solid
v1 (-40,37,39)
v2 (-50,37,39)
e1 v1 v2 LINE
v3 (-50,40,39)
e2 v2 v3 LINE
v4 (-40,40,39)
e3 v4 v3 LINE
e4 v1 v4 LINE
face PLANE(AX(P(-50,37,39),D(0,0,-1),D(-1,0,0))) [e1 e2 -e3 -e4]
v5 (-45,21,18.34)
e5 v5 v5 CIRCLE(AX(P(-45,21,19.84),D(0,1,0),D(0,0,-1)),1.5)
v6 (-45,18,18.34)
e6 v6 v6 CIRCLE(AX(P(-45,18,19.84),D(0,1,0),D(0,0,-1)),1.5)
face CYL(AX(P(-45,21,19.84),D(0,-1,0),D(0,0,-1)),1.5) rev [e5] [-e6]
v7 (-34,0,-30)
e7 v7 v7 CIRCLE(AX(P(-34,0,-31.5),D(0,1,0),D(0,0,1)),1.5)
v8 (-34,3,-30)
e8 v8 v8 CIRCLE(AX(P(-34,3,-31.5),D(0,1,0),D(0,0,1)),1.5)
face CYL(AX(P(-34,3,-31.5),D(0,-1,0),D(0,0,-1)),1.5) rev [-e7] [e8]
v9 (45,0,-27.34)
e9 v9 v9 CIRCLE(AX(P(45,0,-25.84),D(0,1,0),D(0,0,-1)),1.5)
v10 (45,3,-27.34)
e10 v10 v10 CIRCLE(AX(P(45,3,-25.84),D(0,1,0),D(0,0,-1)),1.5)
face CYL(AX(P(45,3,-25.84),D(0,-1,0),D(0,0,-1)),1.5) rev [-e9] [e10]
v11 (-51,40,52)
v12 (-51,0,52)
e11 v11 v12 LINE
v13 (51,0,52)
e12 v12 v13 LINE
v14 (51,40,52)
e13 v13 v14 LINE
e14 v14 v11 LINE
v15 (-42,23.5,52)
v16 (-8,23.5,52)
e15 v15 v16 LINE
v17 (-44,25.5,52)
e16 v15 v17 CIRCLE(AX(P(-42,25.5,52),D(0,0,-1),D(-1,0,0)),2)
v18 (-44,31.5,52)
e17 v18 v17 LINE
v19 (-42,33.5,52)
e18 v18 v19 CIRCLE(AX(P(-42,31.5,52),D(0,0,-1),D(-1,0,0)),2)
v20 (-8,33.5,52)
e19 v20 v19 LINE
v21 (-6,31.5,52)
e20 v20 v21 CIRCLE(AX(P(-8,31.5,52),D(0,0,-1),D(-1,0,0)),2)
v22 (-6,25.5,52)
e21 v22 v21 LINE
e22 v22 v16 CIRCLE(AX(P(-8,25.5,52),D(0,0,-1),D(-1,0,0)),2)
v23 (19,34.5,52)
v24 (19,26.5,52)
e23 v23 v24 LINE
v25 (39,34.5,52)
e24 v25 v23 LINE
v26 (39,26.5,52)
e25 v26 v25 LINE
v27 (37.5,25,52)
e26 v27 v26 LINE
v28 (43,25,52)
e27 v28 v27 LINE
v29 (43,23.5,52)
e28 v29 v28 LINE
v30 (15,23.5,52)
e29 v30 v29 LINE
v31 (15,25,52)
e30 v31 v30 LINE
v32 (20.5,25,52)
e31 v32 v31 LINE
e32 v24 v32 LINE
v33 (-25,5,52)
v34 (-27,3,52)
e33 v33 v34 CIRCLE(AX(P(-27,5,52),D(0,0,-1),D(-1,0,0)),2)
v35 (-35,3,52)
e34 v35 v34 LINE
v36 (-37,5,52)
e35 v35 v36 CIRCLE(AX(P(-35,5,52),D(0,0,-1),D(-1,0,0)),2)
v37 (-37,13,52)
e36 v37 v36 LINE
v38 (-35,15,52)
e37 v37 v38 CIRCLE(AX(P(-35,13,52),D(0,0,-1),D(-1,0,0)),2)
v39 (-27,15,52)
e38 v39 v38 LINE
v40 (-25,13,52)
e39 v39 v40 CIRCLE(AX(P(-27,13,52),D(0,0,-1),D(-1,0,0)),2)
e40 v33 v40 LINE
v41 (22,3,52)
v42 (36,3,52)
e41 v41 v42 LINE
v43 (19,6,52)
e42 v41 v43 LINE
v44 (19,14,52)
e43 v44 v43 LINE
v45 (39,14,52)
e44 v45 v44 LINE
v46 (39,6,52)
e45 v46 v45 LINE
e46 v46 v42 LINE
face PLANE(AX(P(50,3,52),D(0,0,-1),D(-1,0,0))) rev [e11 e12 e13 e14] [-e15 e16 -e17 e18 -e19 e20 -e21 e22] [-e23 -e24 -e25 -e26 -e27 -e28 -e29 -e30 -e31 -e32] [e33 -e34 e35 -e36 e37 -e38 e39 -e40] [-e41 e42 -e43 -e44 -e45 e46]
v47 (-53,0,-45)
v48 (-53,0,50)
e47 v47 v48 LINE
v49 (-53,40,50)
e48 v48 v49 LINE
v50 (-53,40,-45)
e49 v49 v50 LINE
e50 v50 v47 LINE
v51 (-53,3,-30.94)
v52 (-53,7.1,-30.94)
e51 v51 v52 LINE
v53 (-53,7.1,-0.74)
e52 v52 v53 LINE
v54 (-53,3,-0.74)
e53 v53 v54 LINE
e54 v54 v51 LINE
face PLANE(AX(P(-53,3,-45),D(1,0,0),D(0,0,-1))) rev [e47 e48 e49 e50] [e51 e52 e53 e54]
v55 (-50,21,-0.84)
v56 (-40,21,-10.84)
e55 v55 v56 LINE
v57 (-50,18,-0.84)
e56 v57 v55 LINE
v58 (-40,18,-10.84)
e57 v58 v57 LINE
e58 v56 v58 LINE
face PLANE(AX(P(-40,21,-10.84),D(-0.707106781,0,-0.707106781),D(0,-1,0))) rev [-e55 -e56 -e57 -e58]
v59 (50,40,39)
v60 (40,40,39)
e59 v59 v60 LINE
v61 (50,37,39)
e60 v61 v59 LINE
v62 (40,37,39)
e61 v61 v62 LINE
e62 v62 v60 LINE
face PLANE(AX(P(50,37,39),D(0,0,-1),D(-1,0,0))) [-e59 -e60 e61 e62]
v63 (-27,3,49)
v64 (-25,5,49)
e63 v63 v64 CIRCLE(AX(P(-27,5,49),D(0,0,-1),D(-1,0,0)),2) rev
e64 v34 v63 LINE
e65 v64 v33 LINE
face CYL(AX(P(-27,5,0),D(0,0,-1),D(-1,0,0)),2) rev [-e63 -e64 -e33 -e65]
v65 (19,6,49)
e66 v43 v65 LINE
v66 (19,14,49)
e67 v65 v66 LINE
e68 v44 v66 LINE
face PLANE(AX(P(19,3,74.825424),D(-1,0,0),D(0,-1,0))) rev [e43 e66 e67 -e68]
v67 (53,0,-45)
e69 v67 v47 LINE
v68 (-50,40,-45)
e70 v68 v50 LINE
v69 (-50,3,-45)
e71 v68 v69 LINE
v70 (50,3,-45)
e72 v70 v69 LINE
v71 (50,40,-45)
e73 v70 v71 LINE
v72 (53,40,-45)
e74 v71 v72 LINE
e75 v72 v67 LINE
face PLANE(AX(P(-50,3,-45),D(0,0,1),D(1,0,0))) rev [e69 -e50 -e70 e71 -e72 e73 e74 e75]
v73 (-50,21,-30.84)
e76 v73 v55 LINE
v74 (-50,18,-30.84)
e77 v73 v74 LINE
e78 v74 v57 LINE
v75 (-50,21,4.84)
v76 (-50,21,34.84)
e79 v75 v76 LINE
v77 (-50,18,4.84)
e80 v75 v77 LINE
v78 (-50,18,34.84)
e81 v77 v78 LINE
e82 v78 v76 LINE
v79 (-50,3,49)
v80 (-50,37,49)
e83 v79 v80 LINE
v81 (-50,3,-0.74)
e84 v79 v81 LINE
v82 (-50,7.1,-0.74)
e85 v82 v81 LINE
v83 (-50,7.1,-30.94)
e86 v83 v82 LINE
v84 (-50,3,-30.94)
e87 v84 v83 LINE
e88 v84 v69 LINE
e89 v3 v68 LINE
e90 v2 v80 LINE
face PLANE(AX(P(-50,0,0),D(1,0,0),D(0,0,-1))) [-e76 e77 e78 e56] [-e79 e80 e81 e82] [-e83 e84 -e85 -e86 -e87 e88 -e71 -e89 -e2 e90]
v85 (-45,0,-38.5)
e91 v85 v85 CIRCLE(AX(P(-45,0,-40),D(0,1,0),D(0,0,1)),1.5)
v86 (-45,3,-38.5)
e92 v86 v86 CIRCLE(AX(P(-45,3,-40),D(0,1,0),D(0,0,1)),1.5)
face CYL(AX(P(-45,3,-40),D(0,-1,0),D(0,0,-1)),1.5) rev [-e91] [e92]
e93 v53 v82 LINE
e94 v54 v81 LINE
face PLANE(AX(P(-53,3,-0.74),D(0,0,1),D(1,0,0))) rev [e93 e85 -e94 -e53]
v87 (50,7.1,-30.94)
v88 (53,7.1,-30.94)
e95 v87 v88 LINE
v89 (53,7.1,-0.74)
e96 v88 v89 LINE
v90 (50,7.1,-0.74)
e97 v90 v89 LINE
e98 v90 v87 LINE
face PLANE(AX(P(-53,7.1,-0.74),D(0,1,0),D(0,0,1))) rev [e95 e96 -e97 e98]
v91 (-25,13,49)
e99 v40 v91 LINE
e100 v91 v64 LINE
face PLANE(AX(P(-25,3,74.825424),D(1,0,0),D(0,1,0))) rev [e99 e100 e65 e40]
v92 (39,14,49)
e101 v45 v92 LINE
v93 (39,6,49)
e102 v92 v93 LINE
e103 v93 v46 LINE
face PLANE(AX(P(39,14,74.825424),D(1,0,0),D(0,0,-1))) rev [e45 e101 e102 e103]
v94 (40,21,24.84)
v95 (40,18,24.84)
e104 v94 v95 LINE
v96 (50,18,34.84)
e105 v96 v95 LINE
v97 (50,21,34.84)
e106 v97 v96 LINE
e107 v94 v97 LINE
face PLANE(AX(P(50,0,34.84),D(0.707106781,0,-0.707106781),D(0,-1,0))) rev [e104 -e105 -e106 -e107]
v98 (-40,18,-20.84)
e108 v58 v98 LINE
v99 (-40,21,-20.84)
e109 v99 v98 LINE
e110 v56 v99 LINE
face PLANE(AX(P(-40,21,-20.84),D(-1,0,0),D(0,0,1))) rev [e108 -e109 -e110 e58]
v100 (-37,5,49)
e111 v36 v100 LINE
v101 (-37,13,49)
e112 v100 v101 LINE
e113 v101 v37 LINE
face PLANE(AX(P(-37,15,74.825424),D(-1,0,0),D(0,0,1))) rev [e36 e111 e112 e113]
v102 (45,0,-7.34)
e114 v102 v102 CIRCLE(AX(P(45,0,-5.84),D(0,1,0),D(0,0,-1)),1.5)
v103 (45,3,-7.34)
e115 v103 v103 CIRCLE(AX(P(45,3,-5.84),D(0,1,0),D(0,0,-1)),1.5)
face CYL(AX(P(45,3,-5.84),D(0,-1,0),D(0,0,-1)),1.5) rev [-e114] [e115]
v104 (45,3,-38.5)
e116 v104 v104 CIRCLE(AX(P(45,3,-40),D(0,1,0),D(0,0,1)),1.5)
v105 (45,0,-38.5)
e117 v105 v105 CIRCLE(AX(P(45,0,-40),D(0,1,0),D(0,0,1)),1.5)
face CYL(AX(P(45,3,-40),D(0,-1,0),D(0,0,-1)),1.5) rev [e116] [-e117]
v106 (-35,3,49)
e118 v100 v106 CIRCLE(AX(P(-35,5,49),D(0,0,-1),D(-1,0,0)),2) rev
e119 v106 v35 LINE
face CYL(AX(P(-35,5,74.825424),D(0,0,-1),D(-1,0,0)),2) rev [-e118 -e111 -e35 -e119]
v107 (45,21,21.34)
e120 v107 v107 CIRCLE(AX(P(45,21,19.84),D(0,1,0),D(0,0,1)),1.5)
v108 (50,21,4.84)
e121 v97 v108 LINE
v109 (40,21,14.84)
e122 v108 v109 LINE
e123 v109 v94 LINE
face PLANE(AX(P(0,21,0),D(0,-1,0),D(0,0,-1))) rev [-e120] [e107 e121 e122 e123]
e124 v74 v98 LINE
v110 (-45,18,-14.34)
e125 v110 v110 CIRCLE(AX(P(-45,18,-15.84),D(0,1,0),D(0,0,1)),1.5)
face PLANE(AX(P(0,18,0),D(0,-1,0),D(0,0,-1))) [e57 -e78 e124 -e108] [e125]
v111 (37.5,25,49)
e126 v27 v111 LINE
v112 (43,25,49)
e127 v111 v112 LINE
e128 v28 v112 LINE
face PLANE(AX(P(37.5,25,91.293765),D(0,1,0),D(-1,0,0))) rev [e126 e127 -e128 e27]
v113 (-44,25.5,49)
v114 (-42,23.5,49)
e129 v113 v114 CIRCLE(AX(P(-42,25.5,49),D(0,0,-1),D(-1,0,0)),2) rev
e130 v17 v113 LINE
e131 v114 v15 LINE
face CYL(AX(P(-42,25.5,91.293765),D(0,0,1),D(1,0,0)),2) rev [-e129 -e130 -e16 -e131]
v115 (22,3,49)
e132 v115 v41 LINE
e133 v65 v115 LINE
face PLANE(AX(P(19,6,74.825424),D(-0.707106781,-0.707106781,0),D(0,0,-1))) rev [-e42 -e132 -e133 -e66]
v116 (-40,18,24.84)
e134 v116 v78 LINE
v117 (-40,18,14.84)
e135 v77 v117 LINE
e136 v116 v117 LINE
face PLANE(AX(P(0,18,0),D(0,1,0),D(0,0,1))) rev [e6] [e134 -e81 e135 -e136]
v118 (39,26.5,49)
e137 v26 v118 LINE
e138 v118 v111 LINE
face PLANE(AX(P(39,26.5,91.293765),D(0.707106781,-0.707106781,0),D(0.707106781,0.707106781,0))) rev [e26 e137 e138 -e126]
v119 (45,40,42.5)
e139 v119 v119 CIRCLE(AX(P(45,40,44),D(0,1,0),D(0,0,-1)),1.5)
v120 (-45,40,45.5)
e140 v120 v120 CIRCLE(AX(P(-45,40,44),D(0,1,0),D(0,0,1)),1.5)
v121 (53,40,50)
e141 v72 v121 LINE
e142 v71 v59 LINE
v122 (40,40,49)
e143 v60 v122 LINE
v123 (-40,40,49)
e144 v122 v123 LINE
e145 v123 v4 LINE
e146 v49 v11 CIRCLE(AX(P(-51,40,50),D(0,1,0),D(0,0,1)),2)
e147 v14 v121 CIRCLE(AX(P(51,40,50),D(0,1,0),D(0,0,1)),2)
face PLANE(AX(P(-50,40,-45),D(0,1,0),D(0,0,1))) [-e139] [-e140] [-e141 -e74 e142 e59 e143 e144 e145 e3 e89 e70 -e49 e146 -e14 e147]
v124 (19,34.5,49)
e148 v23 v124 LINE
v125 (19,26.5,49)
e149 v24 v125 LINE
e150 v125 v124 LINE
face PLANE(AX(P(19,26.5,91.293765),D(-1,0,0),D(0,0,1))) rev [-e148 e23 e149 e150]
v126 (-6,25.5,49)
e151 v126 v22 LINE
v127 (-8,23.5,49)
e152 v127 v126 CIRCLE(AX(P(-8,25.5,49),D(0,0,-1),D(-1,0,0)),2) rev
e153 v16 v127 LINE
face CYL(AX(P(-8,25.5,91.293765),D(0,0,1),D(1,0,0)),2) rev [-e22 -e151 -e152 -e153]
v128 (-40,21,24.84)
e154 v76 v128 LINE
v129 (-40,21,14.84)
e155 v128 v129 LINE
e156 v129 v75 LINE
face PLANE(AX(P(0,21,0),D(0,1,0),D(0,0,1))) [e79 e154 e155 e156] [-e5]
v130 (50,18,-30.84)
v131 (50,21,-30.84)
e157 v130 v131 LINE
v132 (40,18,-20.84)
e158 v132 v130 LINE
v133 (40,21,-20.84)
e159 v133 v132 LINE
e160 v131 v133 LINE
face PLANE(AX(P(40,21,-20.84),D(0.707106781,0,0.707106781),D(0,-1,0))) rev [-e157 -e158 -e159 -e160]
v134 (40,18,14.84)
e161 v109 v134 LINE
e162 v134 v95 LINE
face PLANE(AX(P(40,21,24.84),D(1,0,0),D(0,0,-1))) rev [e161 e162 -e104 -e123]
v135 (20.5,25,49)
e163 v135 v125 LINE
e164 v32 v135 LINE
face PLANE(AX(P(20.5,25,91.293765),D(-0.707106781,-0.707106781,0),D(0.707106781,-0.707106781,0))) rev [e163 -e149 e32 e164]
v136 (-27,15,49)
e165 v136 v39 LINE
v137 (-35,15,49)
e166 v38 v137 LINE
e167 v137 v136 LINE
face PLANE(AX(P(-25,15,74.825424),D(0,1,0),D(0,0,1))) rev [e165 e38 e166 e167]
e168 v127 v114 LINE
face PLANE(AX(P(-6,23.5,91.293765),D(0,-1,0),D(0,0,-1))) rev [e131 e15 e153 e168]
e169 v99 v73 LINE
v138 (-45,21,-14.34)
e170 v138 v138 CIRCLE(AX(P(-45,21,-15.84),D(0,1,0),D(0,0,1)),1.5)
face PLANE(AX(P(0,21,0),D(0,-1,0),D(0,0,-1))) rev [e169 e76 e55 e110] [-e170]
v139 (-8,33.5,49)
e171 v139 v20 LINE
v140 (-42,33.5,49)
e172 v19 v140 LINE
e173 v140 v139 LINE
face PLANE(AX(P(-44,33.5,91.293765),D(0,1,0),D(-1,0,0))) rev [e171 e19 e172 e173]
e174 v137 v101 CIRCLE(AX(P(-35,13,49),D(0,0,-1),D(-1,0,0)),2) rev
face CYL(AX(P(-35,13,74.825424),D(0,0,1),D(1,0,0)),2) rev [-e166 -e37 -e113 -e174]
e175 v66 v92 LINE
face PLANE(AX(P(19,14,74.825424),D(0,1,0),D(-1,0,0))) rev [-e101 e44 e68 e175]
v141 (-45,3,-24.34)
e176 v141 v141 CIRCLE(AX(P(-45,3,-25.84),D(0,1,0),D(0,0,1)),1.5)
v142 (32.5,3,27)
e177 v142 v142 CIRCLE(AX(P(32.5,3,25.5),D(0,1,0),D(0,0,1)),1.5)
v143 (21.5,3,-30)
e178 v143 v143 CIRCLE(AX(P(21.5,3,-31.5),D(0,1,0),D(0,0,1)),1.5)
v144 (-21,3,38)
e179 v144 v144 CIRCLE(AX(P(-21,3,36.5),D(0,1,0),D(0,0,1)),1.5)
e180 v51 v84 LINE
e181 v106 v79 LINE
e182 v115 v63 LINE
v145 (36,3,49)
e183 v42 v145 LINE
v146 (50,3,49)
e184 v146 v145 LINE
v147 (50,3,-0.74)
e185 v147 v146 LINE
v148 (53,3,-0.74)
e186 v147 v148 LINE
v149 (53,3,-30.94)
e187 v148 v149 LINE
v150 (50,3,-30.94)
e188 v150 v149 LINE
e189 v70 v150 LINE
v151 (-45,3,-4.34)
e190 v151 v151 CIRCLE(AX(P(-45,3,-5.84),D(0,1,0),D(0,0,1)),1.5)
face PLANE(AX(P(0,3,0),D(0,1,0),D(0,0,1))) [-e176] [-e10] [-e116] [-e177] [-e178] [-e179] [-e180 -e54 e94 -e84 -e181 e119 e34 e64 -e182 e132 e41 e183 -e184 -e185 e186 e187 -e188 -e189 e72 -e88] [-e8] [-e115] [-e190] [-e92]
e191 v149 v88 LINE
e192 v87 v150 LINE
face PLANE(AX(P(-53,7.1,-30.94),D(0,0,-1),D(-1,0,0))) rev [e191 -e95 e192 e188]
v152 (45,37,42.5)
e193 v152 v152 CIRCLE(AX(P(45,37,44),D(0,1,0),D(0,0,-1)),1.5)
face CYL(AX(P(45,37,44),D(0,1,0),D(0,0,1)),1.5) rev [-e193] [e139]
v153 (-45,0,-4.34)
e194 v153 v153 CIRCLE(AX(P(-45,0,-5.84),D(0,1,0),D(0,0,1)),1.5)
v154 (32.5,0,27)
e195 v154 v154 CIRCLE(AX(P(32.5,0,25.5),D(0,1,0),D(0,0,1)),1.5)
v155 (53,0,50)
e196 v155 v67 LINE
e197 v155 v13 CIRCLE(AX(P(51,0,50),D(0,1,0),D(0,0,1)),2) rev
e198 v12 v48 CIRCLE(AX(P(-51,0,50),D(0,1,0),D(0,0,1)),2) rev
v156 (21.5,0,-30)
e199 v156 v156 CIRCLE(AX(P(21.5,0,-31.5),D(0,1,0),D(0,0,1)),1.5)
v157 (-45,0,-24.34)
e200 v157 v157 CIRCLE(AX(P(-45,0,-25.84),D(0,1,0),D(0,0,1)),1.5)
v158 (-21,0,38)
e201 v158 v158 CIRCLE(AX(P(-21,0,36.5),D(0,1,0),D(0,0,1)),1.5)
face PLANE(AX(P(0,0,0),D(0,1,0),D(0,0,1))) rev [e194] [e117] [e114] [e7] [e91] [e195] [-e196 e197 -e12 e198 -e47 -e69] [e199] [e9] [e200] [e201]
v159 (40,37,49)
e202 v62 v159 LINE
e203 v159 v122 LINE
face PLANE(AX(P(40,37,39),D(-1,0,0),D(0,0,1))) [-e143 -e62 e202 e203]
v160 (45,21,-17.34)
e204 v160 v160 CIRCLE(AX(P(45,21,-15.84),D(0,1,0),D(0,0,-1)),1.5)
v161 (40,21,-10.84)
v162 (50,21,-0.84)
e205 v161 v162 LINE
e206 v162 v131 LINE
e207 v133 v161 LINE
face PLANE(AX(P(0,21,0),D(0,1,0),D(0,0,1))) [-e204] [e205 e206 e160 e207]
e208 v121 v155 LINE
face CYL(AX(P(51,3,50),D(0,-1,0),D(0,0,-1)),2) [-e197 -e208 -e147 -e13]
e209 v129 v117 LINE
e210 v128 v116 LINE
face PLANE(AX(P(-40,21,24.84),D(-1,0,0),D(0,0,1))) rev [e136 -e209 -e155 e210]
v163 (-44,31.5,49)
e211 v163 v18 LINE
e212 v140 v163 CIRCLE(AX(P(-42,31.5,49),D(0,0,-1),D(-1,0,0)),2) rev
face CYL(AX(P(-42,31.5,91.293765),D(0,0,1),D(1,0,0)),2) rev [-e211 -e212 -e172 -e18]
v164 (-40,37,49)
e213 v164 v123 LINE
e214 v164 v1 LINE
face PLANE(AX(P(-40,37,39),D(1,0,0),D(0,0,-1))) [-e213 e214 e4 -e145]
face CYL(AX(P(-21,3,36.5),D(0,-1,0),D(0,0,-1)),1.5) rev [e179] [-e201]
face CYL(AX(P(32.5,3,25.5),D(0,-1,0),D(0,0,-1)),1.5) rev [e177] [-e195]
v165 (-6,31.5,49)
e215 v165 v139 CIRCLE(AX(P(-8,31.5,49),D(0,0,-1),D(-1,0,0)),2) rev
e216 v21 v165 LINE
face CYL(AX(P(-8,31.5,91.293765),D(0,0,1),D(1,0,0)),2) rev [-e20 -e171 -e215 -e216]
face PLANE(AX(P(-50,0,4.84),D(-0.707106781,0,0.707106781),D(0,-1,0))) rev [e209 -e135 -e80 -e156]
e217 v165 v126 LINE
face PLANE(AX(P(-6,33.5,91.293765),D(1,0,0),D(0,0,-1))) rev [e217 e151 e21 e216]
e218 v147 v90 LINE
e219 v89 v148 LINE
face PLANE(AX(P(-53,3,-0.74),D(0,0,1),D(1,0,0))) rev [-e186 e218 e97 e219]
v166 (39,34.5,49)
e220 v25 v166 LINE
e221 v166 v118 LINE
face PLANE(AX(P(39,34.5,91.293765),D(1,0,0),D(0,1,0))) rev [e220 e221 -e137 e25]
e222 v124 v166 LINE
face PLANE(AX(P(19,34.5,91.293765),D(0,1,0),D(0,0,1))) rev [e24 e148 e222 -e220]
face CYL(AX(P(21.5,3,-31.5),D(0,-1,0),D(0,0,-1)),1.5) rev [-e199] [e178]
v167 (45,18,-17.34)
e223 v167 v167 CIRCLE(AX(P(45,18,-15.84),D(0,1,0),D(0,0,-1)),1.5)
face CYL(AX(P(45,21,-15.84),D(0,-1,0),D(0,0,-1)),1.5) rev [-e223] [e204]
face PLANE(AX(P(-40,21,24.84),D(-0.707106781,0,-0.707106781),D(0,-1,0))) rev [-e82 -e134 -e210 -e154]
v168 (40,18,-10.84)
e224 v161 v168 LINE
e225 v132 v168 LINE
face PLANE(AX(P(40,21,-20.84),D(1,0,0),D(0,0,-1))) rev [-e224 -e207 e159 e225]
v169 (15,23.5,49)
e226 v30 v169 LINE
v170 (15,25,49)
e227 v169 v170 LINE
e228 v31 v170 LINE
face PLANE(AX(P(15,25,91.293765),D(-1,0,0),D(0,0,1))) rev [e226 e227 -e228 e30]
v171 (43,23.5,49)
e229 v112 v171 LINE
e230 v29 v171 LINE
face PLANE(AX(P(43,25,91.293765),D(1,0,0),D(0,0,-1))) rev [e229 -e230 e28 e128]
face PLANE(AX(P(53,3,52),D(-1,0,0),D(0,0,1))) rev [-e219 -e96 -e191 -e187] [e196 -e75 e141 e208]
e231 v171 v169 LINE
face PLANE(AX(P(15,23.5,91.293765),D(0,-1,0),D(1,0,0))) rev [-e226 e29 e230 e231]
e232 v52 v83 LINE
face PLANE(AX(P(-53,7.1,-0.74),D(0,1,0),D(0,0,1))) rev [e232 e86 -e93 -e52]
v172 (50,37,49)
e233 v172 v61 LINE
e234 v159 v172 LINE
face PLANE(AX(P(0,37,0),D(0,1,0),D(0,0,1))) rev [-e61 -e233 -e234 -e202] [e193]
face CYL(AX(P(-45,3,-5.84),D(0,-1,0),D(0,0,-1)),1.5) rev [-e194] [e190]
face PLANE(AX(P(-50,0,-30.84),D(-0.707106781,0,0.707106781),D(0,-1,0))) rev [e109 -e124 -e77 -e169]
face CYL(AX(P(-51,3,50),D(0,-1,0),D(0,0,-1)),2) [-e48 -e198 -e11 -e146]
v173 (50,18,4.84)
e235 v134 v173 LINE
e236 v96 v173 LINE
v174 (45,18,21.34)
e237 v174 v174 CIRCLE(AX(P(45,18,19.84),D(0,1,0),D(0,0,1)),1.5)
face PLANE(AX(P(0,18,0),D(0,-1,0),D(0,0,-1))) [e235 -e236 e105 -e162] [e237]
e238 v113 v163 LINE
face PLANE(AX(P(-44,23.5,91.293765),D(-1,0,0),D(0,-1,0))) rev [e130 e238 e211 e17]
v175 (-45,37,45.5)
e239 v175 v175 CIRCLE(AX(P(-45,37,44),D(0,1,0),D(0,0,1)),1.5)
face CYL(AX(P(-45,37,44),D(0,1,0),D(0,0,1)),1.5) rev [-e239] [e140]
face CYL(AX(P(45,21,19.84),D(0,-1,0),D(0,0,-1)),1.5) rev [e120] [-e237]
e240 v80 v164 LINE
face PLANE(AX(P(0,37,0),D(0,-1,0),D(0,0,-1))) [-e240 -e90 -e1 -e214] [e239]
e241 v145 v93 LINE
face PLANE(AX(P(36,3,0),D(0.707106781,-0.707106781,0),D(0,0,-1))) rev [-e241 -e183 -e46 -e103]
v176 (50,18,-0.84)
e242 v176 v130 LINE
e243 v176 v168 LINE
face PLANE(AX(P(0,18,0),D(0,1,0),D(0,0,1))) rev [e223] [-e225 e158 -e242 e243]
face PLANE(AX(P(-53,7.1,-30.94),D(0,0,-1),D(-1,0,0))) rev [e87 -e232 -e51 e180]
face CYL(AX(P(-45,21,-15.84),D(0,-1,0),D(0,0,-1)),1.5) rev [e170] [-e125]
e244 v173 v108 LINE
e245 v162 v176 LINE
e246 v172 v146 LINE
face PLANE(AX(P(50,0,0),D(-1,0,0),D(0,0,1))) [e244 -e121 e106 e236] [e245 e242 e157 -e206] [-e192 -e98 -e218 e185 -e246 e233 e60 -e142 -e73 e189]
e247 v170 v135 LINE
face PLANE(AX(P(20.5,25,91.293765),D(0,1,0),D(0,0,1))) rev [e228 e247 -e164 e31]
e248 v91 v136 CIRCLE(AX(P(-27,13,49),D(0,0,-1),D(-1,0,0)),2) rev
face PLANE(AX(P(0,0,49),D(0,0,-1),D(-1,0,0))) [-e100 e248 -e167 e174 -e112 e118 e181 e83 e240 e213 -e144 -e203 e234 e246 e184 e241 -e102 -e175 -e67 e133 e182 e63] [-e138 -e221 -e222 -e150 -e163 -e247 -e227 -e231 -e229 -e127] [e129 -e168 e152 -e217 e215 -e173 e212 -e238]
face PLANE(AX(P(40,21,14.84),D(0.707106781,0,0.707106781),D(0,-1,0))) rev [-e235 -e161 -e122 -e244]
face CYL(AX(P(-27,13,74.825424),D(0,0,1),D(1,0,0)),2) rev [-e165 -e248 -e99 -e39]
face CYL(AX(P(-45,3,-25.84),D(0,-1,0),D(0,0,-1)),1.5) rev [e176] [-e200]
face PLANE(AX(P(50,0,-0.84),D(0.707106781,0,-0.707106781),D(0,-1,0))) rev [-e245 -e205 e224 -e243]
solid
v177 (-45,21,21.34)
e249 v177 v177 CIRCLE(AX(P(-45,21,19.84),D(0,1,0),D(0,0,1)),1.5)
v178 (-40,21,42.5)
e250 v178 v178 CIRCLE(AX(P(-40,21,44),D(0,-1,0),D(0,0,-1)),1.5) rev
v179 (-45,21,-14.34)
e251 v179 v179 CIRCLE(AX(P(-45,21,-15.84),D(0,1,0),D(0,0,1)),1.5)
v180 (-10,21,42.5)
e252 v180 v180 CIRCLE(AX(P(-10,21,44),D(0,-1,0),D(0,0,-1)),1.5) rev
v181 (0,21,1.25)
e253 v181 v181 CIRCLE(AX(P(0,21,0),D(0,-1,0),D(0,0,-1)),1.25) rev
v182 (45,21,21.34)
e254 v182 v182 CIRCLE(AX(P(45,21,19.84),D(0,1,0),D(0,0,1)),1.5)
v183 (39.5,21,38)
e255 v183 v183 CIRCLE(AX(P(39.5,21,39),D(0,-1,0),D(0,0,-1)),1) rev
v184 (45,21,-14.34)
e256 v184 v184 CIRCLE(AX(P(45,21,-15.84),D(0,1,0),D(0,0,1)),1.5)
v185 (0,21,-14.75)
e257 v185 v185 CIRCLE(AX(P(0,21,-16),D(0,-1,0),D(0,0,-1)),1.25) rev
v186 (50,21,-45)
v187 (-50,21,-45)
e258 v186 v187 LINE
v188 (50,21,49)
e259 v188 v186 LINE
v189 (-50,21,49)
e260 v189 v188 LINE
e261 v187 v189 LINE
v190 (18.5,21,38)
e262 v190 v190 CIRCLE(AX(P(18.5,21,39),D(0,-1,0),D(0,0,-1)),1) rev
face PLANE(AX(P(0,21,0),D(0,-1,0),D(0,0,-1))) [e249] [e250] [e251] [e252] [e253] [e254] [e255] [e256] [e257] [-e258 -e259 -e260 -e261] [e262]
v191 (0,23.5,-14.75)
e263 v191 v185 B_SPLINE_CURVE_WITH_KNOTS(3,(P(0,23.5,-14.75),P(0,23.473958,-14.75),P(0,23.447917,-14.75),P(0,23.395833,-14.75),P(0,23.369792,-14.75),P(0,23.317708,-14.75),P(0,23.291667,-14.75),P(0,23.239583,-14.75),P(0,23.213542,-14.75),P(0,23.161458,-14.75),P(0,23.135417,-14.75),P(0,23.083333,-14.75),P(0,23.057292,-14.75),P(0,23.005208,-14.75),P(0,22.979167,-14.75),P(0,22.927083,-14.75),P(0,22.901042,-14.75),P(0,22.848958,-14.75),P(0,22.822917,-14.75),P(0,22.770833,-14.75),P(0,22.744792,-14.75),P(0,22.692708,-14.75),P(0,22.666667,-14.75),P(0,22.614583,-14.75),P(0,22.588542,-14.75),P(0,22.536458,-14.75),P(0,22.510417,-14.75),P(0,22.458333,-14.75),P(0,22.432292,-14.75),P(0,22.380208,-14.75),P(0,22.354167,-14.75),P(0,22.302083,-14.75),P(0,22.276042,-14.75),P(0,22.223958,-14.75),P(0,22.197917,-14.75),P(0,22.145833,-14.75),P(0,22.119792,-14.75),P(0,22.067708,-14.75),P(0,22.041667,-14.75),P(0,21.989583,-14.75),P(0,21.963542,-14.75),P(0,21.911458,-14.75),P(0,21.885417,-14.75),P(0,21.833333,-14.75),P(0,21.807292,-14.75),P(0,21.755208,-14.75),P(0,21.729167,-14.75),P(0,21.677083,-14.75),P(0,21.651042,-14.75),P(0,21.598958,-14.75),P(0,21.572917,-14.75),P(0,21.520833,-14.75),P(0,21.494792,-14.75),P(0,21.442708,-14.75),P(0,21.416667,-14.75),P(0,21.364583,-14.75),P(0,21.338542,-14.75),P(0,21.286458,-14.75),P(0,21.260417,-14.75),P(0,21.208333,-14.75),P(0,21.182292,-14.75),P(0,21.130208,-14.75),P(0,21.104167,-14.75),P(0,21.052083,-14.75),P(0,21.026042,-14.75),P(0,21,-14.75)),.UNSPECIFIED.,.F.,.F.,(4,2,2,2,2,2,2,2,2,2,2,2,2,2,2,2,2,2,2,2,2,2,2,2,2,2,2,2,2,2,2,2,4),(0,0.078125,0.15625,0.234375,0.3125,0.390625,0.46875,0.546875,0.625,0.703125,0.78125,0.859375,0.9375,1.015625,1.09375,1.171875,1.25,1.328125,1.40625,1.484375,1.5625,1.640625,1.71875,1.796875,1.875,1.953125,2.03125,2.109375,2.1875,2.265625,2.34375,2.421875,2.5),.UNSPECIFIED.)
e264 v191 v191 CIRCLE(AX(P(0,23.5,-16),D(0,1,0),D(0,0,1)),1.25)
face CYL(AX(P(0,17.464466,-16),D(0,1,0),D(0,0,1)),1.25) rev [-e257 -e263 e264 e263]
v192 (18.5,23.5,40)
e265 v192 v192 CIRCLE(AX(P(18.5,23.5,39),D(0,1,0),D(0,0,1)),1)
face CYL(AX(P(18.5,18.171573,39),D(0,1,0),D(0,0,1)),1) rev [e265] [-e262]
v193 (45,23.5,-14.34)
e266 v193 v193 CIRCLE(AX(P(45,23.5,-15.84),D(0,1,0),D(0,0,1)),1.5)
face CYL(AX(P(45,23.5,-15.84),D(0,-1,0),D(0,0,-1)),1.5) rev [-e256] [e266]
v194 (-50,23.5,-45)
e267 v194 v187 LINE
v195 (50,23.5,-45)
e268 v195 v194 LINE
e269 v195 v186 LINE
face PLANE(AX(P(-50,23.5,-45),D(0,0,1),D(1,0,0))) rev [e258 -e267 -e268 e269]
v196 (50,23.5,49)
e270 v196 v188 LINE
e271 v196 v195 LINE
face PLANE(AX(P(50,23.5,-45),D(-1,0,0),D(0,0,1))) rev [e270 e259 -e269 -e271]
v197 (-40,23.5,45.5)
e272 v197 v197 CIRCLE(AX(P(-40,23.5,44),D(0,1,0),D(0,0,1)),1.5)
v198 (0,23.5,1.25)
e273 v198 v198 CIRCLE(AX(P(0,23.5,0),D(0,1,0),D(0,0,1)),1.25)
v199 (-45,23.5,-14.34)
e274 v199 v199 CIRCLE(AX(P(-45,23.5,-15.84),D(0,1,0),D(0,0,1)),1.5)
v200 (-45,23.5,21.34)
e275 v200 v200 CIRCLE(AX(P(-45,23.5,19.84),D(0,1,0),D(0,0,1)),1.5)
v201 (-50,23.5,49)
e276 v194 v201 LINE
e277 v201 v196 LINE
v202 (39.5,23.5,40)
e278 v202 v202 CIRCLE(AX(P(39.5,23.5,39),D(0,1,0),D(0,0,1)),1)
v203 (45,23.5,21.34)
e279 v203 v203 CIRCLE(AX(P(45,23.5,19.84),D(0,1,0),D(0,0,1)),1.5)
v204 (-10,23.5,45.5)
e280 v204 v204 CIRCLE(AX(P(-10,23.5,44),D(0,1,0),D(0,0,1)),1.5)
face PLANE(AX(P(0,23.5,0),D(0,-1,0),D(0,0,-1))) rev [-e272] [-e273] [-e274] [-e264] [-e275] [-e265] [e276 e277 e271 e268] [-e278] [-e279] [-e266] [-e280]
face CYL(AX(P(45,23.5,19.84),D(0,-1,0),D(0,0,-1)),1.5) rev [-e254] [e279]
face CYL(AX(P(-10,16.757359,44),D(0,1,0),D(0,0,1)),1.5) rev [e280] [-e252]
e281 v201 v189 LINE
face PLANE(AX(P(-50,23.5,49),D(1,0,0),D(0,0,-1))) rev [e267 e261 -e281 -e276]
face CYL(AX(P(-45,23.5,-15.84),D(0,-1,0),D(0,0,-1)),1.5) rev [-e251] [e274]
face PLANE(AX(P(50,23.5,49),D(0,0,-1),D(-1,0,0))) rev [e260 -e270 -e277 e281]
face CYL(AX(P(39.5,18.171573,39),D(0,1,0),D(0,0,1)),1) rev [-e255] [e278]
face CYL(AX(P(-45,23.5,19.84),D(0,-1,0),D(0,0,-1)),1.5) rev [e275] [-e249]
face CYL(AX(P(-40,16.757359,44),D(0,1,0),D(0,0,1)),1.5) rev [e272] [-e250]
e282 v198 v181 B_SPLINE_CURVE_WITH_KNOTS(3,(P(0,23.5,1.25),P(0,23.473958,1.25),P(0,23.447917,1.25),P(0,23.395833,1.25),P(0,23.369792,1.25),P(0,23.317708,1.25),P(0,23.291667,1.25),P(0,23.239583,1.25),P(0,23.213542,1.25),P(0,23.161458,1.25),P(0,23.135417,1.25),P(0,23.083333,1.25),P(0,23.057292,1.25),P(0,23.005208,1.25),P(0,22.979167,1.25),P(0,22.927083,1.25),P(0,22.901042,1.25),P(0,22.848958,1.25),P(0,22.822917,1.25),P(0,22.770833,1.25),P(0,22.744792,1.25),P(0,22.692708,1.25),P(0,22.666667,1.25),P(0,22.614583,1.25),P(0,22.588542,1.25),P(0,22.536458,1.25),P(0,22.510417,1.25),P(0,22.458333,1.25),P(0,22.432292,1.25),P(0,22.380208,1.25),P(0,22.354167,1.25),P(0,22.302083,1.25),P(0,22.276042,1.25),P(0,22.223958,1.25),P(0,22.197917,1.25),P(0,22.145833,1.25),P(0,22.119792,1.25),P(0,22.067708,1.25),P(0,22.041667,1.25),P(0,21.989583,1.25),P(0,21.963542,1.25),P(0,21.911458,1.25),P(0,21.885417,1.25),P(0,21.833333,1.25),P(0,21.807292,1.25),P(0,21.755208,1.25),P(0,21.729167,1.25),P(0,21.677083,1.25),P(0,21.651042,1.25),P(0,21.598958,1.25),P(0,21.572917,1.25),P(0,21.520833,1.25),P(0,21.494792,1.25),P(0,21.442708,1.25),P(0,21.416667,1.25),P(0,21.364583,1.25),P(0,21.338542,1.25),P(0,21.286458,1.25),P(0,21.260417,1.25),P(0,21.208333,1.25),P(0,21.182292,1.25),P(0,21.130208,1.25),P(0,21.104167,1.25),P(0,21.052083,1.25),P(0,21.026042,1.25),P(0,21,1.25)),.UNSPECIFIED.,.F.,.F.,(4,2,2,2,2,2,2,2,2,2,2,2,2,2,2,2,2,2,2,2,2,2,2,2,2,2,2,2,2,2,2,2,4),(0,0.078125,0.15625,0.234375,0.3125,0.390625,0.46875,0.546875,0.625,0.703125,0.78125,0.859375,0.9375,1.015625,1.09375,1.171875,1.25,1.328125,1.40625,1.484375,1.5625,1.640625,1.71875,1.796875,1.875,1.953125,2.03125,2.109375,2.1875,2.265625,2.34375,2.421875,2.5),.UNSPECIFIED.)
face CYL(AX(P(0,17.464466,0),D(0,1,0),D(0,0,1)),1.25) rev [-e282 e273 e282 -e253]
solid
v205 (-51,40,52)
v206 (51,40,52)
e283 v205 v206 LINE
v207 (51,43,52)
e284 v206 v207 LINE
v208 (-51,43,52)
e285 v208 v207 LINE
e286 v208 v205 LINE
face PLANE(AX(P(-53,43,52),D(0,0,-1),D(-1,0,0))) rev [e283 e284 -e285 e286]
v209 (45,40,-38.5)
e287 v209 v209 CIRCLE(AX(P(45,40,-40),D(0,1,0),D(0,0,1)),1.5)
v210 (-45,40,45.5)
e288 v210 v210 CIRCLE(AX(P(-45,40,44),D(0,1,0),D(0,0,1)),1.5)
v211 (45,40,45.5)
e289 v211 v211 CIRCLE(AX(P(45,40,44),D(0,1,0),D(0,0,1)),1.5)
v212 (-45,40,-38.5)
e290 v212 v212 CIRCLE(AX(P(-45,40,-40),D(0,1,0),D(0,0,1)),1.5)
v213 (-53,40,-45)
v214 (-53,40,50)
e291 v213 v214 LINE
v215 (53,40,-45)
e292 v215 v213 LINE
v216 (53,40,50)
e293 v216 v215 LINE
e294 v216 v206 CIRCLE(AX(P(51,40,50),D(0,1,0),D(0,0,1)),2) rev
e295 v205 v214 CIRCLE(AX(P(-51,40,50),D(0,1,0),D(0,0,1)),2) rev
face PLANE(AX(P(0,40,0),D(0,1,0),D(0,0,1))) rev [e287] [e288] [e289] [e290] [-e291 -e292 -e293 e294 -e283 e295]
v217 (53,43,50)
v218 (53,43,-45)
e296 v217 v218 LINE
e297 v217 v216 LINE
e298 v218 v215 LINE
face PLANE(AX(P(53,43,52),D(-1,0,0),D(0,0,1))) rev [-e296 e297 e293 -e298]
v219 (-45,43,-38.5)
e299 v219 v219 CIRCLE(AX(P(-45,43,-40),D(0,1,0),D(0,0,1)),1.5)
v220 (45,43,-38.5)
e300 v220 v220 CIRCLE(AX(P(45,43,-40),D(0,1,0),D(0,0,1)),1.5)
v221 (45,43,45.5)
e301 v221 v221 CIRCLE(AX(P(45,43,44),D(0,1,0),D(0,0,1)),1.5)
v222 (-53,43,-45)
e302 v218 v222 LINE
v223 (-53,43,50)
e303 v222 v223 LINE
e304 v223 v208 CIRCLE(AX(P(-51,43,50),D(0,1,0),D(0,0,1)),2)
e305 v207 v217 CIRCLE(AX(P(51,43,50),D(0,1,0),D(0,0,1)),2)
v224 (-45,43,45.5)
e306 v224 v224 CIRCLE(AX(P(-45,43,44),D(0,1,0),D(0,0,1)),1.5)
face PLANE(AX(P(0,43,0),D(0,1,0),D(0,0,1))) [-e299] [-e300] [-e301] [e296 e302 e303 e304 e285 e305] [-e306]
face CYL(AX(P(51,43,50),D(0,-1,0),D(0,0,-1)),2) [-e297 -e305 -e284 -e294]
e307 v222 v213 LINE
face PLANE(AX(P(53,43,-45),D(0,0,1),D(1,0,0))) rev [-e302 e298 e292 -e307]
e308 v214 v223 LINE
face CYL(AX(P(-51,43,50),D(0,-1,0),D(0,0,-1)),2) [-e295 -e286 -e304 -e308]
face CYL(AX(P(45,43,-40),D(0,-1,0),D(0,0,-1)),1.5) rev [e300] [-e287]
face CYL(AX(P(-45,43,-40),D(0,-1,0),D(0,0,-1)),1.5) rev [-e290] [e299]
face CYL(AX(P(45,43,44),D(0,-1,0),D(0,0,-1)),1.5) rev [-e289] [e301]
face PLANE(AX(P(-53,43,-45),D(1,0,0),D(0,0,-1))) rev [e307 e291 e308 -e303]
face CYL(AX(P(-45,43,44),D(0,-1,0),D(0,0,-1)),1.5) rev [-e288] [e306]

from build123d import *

# Parameters (mm, degrees)
SKETCH1_R               = 1.5
BOSS_EXTRUDE1_DEPTH     = 3
SKETCH2_W               = 97
SKETCH2_H               = 40
BOSS_EXTRUDE2_DEPTH     = 3
SKETCH3_W               = 97
SKETCH3_H               = 40
BOSS_EXTRUDE3_DEPTH     = 3
SKETCH4_W               = 106
SKETCH4_H               = 40
BOSS_EXTRUDE4_DEPTH     = 3
SKETCH5_W               = 12
SKETCH5_H               = 12
SKETCH5_W_2             = 20
SKETCH5_H_2             = 11
CUT_EXTRUDE1_DEPTH      = 3
FILLET1_R               = 2
CHAMFER1_SIZE           = 3
CUT_EXTRUDE2_DEPTH      = 85.338603261
CUT_EXTRUDE2_DEPTH_BACK = 85.338603261
SKETCH7_W               = 30.2
SKETCH7_H               = 4.1
SKETCH9_W               = 10
SKETCH9_H               = 10
SKETCH9_R               = 1.5
BOSS_EXTRUDE5_DEPTH     = 3
CHAMFER2_SIZE           = 10
SKETCH10_W              = 100
SKETCH10_H              = 94
SKETCH10_R              = 1.5
BOSS_EXTRUDE6_DEPTH     = 2.5
SKETCH11_W              = 10
SKETCH11_H              = 10
SKETCH11_R              = 1.5
BOSS_EXTRUDE7_DEPTH     = 3
SKETCH12_W              = 38
SKETCH12_H              = 10
CUT_EXTRUDE3_DEPTH      = 3
SKETCH14_R              = 1
CUT_EXTRUDE4_DEPTH      = 2.5
SKETCH15_R              = 1.5
CUT_EXTRUDE5_DEPTH      = 2.5
SKETCH16_R              = 1.25
CUT_EXTRUDE6_DEPTH      = 2.5
SKETCH17_W              = 106
SKETCH17_H              = 97
SKETCH17_R              = 1.5
BOSS_EXTRUDE8_DEPTH     = 3
FILLET2_R               = 2
FILLET3_R               = 2
FILLET4_R               = 2


with BuildPart() as part:
    # Sketch1 → Boss-Extrude1 (new body)
    with BuildSketch(Plane(origin=(0, 0, 0), x_dir=(1, 0, 0), z_dir=(0, 1, 0))):
        Polygon((-50, 45), (50, 45), (53, 45), (53, -52), (50, -52), (-50, -52), (-53, -52), (-53, 45), align=None)
        with Locations(Location((-45, 40, 0), (0, 0, 270))):
            Circle(SKETCH1_R, mode=Mode.SUBTRACT)
        with Locations(Location((45, 40, 0), (0, 0, 270))):
            Circle(SKETCH1_R, mode=Mode.SUBTRACT)
        with Locations(Location((-45, 25.84, 0), (0, 0, 270))):
            Circle(SKETCH1_R, mode=Mode.SUBTRACT)
        with Locations(Location((-45, 5.84, 0), (0, 0, 270))):
            Circle(SKETCH1_R, mode=Mode.SUBTRACT)
        with Locations(Location((45, 5.84, 0), (0, 0, 90))):
            Circle(SKETCH1_R, mode=Mode.SUBTRACT)
        with Locations(Location((45, 25.84, 0), (0, 0, 90))):
            Circle(SKETCH1_R, mode=Mode.SUBTRACT)
        with Locations(Location((-34, 31.5, 0), (0, 0, 270))):
            Circle(SKETCH1_R, mode=Mode.SUBTRACT)
        with Locations(Location((21.5, 31.5, 0), (0, 0, 270))):
            Circle(SKETCH1_R, mode=Mode.SUBTRACT)
        with Locations(Location((-21, -36.5, 0), (0, 0, 270))):
            Circle(SKETCH1_R, mode=Mode.SUBTRACT)
        with Locations(Location((32.5, -25.5, 0), (0, 0, 270))):
            Circle(SKETCH1_R, mode=Mode.SUBTRACT)
    extrude(amount=BOSS_EXTRUDE1_DEPTH)

    # Sketch2 → Boss-Extrude2 (add)
    with BuildSketch(Plane.ZY.offset(53)):
        with Locations((3.5, 20)):
            Rectangle(SKETCH2_W, SKETCH2_H)
    extrude(amount=-BOSS_EXTRUDE2_DEPTH)

    # Sketch3 → Boss-Extrude3 (add)
    with BuildSketch(Plane(origin=(53, 0, 0), x_dir=(0, 0, -1), z_dir=(1, 0, 0))):
        with Locations((-3.5, 20)):
            Rectangle(SKETCH3_W, SKETCH3_H)
    extrude(amount=-BOSS_EXTRUDE3_DEPTH)

    # Sketch4 → Boss-Extrude4 (add)
    with BuildSketch(Plane.XY.offset(52)):
        with Locations((0, 20)):
            Rectangle(SKETCH4_W, SKETCH4_H)
    extrude(amount=-BOSS_EXTRUDE4_DEPTH)

    # Sketch5 → Cut-Extrude1 (cut)
    with BuildSketch(Plane(origin=(0, 0, 49), x_dir=(-1, 0, 0), z_dir=(0, 0, -1))):
        with Locations((31, 9)):
            Rectangle(SKETCH5_W, SKETCH5_H)
        with Locations((-29, 8.5)):
            Rectangle(SKETCH5_W_2, SKETCH5_H_2)
    extrude(amount=-CUT_EXTRUDE1_DEPTH, mode=Mode.SUBTRACT)

    # Fillet1
    fillet1_edges = [part.edges().sort_by_distance(p)[0] for p in [
        (-37, 3, 50.5),
        (-25, 3, 50.5),
        (-25, 15, 50.5),
        (-37, 15, 50.5),
    ]]
    fillet(fillet1_edges, radius=FILLET1_R)

    # Chamfer1
    chamfer1_edges = [part.edges().sort_by_distance(p)[0] for p in [
        (19, 3, 50.5),
        (39, 3, 50.5),
    ]]
    chamfer(chamfer1_edges, length=CHAMFER1_SIZE)

    # Sketch7 → Cut-Extrude2 (cut, two sides: drawn at the far end of the back side and taken through both)
    with BuildSketch(Plane(origin=(0, 0, 0), x_dir=(0, 0, -1), z_dir=(1, 0, 0)).offset(-CUT_EXTRUDE2_DEPTH_BACK)):
        with Locations((15.84, 5.05)):
            Rectangle(SKETCH7_W, SKETCH7_H)
    extrude(amount=CUT_EXTRUDE2_DEPTH + CUT_EXTRUDE2_DEPTH_BACK, mode=Mode.SUBTRACT)

    # Sketch9 → Boss-Extrude5 (add)
    # profile 1 of 4: a face of its own
    with BuildSketch(Plane(origin=(0, 18, 0), x_dir=(1, 0, 0), z_dir=(0, 1, 0))):
        with Locations((-45, 15.84)):
            Rectangle(SKETCH9_W, SKETCH9_H)
        with Locations(Location((-45, 15.84, 0), (0, 0, 270))):
            Circle(SKETCH9_R, mode=Mode.SUBTRACT)
    # profile 2 of 4: a face of its own
    with BuildSketch(Plane(origin=(0, 18, 0), x_dir=(1, 0, 0), z_dir=(0, 1, 0))):
        with Locations((45, 15.84)):
            Rectangle(SKETCH9_W, SKETCH9_H)
        with Locations(Location((45, 15.84, 0), (0, 0, 90))):
            Circle(SKETCH9_R, mode=Mode.SUBTRACT)
    # profile 3 of 4: a face of its own
    with BuildSketch(Plane(origin=(0, 18, 0), x_dir=(1, 0, 0), z_dir=(0, 1, 0))):
        with Locations((45, -19.84)):
            Rectangle(SKETCH9_W, SKETCH9_H)
        with Locations(Location((45, -19.84, 0), (0, 0, 270))):
            Circle(SKETCH9_R, mode=Mode.SUBTRACT)
    # profile 4 of 4: a face of its own
    with BuildSketch(Plane(origin=(0, 18, 0), x_dir=(1, 0, 0), z_dir=(0, 1, 0))):
        with Locations((-45, -19.84)):
            Rectangle(SKETCH9_W, SKETCH9_H)
        with Locations(Location((-45, -19.84, 0), (0, 0, 90))):
            Circle(SKETCH9_R, mode=Mode.SUBTRACT)
    extrude(amount=BOSS_EXTRUDE5_DEPTH)

    # Chamfer2
    chamfer2_edges = [part.edges().sort_by_distance(p)[0] for p in [
        (50, 19.5, 14.84),
        (50, 19.5, -10.84),
        (-50, 19.5, 14.84),
        (-50, 19.5, -10.84),
        (50, 19.5, -20.84),
        (50, 19.5, 24.84),
        (-50, 19.5, -20.84),
        (-50, 19.5, 24.84),
    ]]
    chamfer(chamfer2_edges, length=CHAMFER2_SIZE - 0.0001)  # a hair under: the kernel refuses the full size

    # Sketch11 → Boss-Extrude7 (add)
    # profile 1 of 2: a face of its own
    with BuildSketch(Plane(origin=(0, 40, 0), x_dir=(1, 0, 0), z_dir=(0, 1, 0))):
        with Locations((-45, -44)):
            Rectangle(SKETCH11_W, SKETCH11_H)
        with Locations(Location((-45, -44, 0), (0, 0, 270))):
            Circle(SKETCH11_R, mode=Mode.SUBTRACT)
    # profile 2 of 2: a face of its own
    with BuildSketch(Plane(origin=(0, 40, 0), x_dir=(1, 0, 0), z_dir=(0, 1, 0))):
        with Locations((45, -44)):
            Rectangle(SKETCH11_W, SKETCH11_H)
        with Locations(Location((45, -44, 0), (0, 0, 90))):
            Circle(SKETCH11_R, mode=Mode.SUBTRACT)
    extrude(amount=-BOSS_EXTRUDE7_DEPTH)

    # Sketch12 → Cut-Extrude3 (cut)
    with BuildSketch(Plane(origin=(0, 0, 49), x_dir=(-1, 0, 0), z_dir=(0, 0, -1))):
        Polygon((-36, 23.5), (-22, 23.5), (-15, 23.5), (-15, 25), (-20.5, 25), (-19, 26.5), (-19, 34.5), (-39, 34.5), (-39, 26.5), (-37.5, 25), (-43, 25), (-43, 23.5), align=None)
        with Locations((25, 28.5)):
            Rectangle(SKETCH12_W, SKETCH12_H)
    extrude(amount=-CUT_EXTRUDE3_DEPTH, mode=Mode.SUBTRACT)

    # Fillet2
    fillet2_edges = [part.edges().sort_by_distance(p)[0] for p in [
        (-44, 23.5, 50.5),
        (-6, 23.5, 50.5),
        (-6, 33.5, 50.5),
        (-44, 33.5, 50.5),
    ]]
    fillet(fillet2_edges, radius=FILLET2_R)

    # Fillet3
    fillet3_edges = [part.edges().sort_by_distance(p)[0] for p in [
        (53, 20, 52),
        (-53, 20, 52),
    ]]
    fillet(fillet3_edges, radius=FILLET3_R)


with BuildPart() as body_2:
    # Sketch10 → Boss-Extrude6 (new body)
    with BuildSketch(Plane(origin=(0, 21, 0), x_dir=(1, 0, 0), z_dir=(0, 1, 0))):
        with Locations((0, -2)):
            Rectangle(SKETCH10_W, SKETCH10_H)
        with Locations(Location((-45, 15.84, 0), (0, 0, 270))):
            Circle(SKETCH10_R, mode=Mode.SUBTRACT)
        with Locations(Location((-45, -19.84, 0), (0, 0, 270))):
            Circle(SKETCH10_R, mode=Mode.SUBTRACT)
        with Locations(Location((45, -19.84, 0), (0, 0, 270))):
            Circle(SKETCH10_R, mode=Mode.SUBTRACT)
        with Locations(Location((45, 15.84, 0), (0, 0, 270))):
            Circle(SKETCH10_R, mode=Mode.SUBTRACT)
    extrude(amount=BOSS_EXTRUDE6_DEPTH)

    # Sketch14 → Cut-Extrude4 (cut)
    with BuildSketch(Plane(origin=(0, 23.5, 0), x_dir=(1, 0, 0), z_dir=(0, 1, 0))):
        with Locations(Location((18.5, -39, 0), (0, 0, 270))):
            Circle(SKETCH14_R)
        with Locations(Location((39.5, -39, 0), (0, 0, 270))):
            Circle(SKETCH14_R)
    extrude(amount=-CUT_EXTRUDE4_DEPTH, mode=Mode.SUBTRACT)

    # Sketch15 → Cut-Extrude5 (cut)
    with BuildSketch(Plane(origin=(0, 23.5, 0), x_dir=(1, 0, 0), z_dir=(0, 1, 0))):
        with Locations(Location((-40, -44, 0), (0, 0, 270))):
            Circle(SKETCH15_R)
        with Locations(Location((-10, -44, 0), (0, 0, 270))):
            Circle(SKETCH15_R)
    extrude(amount=-CUT_EXTRUDE5_DEPTH, mode=Mode.SUBTRACT)

    # Sketch16 → Cut-Extrude6 (cut)
    with BuildSketch(Plane(origin=(0, 23.5, 0), x_dir=(1, 0, 0), z_dir=(0, 1, 0))):
        with Locations(Location((0, 0, 0), (0, 0, 270))):
            Circle(SKETCH16_R)
        with Locations(Location((0, 16, 0), (0, 0, 270))):
            Circle(SKETCH16_R)
    extrude(amount=-CUT_EXTRUDE6_DEPTH, mode=Mode.SUBTRACT)


with BuildPart() as body_3:
    # Sketch17 → Boss-Extrude8 (new body)
    with BuildSketch(Plane(origin=(0, 40, 0), x_dir=(1, 0, 0), z_dir=(0, 1, 0))):
        with Locations((0, -3.5)):
            Rectangle(SKETCH17_W, SKETCH17_H)
        with Locations(Location((-45, -44, 0), (0, 0, 270))):
            Circle(SKETCH17_R, mode=Mode.SUBTRACT)
        with Locations(Location((45, 40, 0), (0, 0, 270))):
            Circle(SKETCH17_R, mode=Mode.SUBTRACT)
        with Locations(Location((-45, 40, 0), (0, 0, 270))):
            Circle(SKETCH17_R, mode=Mode.SUBTRACT)
        with Locations(Location((45, -44, 0), (0, 0, 270))):
            Circle(SKETCH17_R, mode=Mode.SUBTRACT)
    extrude(amount=BOSS_EXTRUDE8_DEPTH)

    # Fillet4
    fillet4_edges = [body_3.edges().sort_by_distance(p)[0] for p in [
        (53, 41.5, 52),
        (-53, 41.5, 52),
    ]]
    fillet(fillet4_edges, radius=FILLET4_R)


solid = Compound([part.part, body_2.part, body_3.part])
